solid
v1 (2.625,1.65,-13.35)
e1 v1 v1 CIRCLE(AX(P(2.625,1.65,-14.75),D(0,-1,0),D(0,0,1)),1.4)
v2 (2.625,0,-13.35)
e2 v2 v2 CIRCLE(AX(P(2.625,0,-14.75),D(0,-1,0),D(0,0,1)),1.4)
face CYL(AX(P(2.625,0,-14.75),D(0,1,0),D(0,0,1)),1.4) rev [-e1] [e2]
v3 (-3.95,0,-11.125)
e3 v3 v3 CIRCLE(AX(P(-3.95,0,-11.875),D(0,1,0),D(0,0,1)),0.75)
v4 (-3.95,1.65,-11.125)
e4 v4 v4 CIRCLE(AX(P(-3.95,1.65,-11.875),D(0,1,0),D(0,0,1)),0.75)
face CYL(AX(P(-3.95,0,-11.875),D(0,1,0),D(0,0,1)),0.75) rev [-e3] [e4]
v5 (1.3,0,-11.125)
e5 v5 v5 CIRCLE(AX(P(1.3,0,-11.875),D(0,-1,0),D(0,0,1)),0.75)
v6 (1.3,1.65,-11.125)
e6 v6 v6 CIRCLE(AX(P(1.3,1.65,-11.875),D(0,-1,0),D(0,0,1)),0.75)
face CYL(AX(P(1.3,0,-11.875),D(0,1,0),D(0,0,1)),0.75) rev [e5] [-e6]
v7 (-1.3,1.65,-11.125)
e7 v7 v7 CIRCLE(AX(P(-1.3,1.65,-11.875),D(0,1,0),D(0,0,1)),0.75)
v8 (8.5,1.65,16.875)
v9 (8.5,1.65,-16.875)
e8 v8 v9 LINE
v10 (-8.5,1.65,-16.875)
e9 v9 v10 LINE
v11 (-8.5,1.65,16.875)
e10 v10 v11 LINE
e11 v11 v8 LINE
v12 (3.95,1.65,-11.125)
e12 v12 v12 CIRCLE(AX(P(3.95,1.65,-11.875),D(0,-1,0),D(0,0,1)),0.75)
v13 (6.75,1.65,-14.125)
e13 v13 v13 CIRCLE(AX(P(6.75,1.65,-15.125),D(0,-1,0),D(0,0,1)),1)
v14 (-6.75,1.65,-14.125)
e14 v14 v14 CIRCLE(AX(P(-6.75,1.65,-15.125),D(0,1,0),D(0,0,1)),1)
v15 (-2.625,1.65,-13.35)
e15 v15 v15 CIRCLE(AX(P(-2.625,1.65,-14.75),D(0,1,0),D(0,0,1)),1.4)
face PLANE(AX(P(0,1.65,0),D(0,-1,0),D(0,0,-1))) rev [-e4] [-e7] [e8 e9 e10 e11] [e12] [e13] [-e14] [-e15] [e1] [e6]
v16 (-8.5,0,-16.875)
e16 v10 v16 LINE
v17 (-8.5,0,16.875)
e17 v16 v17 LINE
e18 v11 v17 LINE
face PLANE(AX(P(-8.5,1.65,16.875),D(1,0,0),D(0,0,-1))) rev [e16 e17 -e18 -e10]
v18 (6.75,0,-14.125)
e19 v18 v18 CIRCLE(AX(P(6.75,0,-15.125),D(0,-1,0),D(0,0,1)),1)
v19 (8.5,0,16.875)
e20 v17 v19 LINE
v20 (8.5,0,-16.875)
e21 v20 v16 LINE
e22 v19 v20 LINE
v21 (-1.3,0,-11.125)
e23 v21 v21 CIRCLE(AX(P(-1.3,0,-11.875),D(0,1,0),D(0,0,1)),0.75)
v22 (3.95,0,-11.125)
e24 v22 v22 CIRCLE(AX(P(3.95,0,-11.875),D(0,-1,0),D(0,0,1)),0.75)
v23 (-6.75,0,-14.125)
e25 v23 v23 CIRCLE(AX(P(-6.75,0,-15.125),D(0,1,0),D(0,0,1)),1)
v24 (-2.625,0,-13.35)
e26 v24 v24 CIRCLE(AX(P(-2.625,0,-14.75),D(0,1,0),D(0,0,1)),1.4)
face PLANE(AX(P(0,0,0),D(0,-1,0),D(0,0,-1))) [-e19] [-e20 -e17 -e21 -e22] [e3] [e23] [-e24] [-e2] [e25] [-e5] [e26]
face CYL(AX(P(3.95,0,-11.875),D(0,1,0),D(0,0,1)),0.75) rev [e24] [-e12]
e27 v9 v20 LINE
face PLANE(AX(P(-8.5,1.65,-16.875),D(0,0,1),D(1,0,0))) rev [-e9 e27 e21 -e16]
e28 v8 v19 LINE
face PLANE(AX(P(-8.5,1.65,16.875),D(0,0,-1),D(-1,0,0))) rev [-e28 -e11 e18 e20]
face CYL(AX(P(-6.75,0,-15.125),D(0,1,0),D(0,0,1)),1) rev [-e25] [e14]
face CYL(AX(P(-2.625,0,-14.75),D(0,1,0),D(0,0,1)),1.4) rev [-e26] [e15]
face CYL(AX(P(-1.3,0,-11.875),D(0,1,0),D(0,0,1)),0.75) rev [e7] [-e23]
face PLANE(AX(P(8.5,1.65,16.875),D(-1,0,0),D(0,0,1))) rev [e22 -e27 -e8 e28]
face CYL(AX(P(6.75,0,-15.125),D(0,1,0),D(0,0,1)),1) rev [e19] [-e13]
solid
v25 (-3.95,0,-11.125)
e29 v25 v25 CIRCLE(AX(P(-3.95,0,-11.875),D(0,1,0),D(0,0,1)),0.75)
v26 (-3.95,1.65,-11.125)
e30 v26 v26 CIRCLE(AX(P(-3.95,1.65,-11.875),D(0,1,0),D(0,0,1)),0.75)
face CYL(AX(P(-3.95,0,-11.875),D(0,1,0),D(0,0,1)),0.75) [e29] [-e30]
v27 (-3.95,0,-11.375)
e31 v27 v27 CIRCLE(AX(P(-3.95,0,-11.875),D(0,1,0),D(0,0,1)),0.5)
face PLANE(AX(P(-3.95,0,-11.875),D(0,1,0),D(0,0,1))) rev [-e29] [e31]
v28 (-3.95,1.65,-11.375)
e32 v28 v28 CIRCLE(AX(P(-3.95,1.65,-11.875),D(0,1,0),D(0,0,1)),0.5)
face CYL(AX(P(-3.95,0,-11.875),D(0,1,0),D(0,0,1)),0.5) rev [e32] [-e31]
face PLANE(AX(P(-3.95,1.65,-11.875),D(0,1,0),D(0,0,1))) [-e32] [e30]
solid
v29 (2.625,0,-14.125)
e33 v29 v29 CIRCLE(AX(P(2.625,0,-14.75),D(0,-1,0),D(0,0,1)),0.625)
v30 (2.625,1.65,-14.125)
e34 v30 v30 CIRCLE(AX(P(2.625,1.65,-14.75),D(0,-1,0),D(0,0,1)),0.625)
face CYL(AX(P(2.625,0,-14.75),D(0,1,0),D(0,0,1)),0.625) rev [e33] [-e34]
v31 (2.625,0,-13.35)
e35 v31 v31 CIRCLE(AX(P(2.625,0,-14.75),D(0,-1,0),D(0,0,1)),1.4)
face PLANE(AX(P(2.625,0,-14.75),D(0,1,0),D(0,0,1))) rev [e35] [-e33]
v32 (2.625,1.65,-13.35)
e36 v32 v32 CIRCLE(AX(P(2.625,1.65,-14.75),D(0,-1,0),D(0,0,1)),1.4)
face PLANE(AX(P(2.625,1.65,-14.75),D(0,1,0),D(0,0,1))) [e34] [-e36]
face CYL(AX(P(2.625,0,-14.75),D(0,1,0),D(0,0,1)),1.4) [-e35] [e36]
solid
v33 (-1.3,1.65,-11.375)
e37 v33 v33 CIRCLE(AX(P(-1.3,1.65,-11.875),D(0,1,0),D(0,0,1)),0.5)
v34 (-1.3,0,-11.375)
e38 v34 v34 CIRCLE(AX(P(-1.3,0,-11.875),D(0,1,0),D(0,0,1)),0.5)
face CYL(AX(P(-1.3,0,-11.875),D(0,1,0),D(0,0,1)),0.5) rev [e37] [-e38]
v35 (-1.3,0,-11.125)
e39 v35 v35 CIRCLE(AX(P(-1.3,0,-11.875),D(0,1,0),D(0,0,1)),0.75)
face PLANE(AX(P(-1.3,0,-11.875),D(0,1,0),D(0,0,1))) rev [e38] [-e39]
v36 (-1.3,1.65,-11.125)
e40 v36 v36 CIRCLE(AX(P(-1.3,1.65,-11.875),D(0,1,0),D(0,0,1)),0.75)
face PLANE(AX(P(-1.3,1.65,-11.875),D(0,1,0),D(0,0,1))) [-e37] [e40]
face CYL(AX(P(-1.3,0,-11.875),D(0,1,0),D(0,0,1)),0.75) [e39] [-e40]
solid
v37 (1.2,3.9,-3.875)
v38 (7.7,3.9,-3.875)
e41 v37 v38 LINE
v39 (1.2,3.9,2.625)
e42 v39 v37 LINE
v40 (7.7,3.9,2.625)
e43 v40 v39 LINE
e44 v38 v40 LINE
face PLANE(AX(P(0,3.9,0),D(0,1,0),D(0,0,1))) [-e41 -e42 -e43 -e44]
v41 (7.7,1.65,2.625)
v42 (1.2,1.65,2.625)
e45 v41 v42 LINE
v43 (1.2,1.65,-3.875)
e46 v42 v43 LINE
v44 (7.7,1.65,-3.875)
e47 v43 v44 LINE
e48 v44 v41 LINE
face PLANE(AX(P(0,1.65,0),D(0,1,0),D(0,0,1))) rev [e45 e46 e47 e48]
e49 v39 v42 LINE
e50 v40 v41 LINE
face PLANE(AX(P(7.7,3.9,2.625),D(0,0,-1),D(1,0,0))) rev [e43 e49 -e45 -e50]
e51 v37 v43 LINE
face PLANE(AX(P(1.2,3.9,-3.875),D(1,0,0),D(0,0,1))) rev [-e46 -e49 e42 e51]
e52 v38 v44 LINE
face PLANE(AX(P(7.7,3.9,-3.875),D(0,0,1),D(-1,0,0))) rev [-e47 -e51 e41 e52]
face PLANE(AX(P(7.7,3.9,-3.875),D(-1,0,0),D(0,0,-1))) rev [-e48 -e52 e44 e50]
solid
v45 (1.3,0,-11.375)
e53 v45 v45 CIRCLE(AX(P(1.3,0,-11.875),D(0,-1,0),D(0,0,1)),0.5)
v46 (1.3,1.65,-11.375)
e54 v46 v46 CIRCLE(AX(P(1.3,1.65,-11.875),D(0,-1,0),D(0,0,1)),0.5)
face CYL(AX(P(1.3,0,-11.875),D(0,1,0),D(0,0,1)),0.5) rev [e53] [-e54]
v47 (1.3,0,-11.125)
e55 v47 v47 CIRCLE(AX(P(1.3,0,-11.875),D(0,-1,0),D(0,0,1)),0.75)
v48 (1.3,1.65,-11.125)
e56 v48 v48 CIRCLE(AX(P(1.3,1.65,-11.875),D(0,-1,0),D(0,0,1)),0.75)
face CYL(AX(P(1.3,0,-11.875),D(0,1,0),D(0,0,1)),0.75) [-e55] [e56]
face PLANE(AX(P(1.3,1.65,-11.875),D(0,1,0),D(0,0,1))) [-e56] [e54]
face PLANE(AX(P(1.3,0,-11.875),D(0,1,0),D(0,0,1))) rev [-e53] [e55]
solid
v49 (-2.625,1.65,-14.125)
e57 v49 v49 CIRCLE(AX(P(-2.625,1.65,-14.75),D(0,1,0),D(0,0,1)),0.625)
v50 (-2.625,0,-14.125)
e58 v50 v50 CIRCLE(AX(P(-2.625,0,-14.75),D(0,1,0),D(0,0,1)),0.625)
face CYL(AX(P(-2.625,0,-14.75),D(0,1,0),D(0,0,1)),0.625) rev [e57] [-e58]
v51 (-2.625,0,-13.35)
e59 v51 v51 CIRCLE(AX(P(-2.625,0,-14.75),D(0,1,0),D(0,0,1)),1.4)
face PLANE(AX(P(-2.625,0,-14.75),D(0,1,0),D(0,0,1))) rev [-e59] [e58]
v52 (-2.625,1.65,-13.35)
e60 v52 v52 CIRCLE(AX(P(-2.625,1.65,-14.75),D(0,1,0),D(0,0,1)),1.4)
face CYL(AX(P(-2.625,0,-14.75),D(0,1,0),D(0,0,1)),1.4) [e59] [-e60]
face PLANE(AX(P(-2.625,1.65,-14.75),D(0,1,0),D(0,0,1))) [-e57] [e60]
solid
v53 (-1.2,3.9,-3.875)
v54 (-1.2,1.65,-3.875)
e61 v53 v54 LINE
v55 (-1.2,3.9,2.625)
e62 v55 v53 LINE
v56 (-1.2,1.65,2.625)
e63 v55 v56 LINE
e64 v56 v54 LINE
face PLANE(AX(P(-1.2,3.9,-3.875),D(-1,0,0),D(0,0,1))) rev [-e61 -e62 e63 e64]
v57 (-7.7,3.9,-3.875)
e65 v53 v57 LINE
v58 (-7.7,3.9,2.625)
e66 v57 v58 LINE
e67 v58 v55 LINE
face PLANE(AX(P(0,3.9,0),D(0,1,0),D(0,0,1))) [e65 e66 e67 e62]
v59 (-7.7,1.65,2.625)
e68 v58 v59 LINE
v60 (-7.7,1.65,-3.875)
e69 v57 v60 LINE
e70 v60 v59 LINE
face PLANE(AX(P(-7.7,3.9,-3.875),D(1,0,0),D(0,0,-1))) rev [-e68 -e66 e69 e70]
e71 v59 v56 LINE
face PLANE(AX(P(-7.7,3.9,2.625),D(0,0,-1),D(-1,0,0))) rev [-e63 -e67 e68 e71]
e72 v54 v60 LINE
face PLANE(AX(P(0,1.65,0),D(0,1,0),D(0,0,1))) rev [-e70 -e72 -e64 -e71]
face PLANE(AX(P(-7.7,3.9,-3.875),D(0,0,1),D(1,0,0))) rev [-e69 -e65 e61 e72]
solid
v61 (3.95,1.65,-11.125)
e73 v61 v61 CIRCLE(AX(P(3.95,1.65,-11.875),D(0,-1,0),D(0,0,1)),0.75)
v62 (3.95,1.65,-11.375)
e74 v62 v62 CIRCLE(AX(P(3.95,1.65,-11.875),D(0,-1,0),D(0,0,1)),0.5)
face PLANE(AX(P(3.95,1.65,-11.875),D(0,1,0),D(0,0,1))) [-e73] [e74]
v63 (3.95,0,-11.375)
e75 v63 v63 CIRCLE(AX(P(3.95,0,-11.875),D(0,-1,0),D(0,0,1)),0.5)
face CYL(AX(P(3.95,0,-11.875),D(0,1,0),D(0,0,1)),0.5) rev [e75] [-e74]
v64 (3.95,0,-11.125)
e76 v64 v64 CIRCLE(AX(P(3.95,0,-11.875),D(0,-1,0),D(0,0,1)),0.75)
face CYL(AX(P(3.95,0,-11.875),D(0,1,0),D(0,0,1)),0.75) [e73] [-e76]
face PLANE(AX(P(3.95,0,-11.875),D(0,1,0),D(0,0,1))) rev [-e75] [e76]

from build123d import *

# Parameters (mm, degrees)
PCB_SKETCH_W                     = 17
PCB_SKETCH_H                     = 33.75
PCB_EXTRUDE_DEPTH                = 1.65
THROUGH_HOLE_SKETCH_R            = 1.4
THROUGH_HOLE_SKETCH_R_2          = 0.625
THROUGH_HOLE_SKETCH_R_3          = 0.75
THROUGH_HOLE_SKETCH_R_4          = 0.5
THROUGH_HOLE_CUT_DEPTH           = 19.966763693
MOUNTING_HOLES_SKETCH_R          = 1
MOUNTING_HOLE_CUT_DEPTH          = 1.65
HOLES_MIRROR_OUTLINE_R           = 1.4
HOLES_MIRROR_OUTLINE_R_2         = 0.75
HOLES_MIRROR_OUTLINE_R_3         = 1
HOLES_MIRROR_DEPTH               = 1.65
THROUGH_HOLE_EXTRUDE_OUTLINE_R   = 0.75
THROUGH_HOLE_EXTRUDE_OUTLINE_R_2 = 0.5
THROUGH_HOLE_EXTRUDE_OUTLINE_R_3 = 1.4
THROUGH_HOLE_EXTRUDE_OUTLINE_R_4 = 0.625
THROUGH_HOLE_EXTRUDE_DEPTH       = 1.65
MOSFET_SKETCH_W                  = 6.5
MOSFET_SKETCH_H                  = 6.5
MOSFET_EXTRUDE_DEPTH             = 2.25


# Read off the part's stored shape, not the designer's step: Holes Mirror, Through Hole Extrude
with BuildPart() as part:
    # PCB Sketch → PCB Extrude (new body)
    with BuildSketch(Plane(origin=(0, 0, 0), x_dir=(1, 0, 0), z_dir=(0, 1, 0))):
        Rectangle(PCB_SKETCH_W, PCB_SKETCH_H)
    extrude(amount=PCB_EXTRUDE_DEPTH)

    # Through Hole Sketch → Through Hole Cut (cut, through all)
    # profile 1 of 4: a face of its own
    with BuildSketch(Plane(origin=(0, 1.65, 0), x_dir=(1, 0, 0), z_dir=(0, 1, 0))):
        with Locations(Location((-2.625, 14.75, 0), (0, 0, 270))):
            Circle(THROUGH_HOLE_SKETCH_R)
        with Locations((-2.625, 14.75)):
            Circle(THROUGH_HOLE_SKETCH_R_2, mode=Mode.SUBTRACT)
    # profile 2 of 4: a face of its own
    with BuildSketch(Plane(origin=(0, 1.65, 0), x_dir=(1, 0, 0), z_dir=(0, 1, 0))):
        with Locations((-2.625, 14.75)):
            Circle(THROUGH_HOLE_SKETCH_R_2)
    # profile 3 of 4: a face of its own
    with BuildSketch(Plane(origin=(0, 1.65, 0), x_dir=(1, 0, 0), z_dir=(0, 1, 0))):
        with Locations(Location((-1.3, 11.875, 0), (0, 0, 270))):
            Circle(THROUGH_HOLE_SKETCH_R_3)
        with Locations((-1.3, 11.875)):
            Circle(THROUGH_HOLE_SKETCH_R_4, mode=Mode.SUBTRACT)
    # profile 4 of 4: a face of its own
    with BuildSketch(Plane(origin=(0, 1.65, 0), x_dir=(1, 0, 0), z_dir=(0, 1, 0))):
        with Locations(Location((-3.95, 11.875, 0), (0, 0, 270))):
            Circle(THROUGH_HOLE_SKETCH_R_3)
    extrude(amount=-THROUGH_HOLE_CUT_DEPTH, mode=Mode.SUBTRACT)


with BuildPart() as through_hole_cut_kept_piece:
    # of the separate pieces the step leaves, the one the design keeps (through_hole_cut_pieces_kept)
    add(part.part.solids().sort_by_distance((-8.5, 0, 16.875))[0])

    # Mounting Holes Sketch → Mounting Hole Cut (cut)
    with BuildSketch(Plane(origin=(0, 1.65, 0), x_dir=(1, 0, 0), z_dir=(0, 1, 0))):
        with Locations(Location((-6.75, 15.125, 0), (0, 0, 270))):
            Circle(MOUNTING_HOLES_SKETCH_R)
    extrude(amount=-MOUNTING_HOLE_CUT_DEPTH, mode=Mode.SUBTRACT)

    # Holes Mirror outline → Holes Mirror (cut)
    with BuildSketch(Plane(origin=(0, 0, 0), x_dir=(1, 0, 0), z_dir=(0, 1, 0))):
        with Locations((2.625, 14.75)):
            Circle(HOLES_MIRROR_OUTLINE_R)
        with Locations((1.3, 11.875)):
            Circle(HOLES_MIRROR_OUTLINE_R_2)
        with Locations((3.95, 11.875)):
            Circle(HOLES_MIRROR_OUTLINE_R_2)
        with Locations((6.75, 15.125)):
            Circle(HOLES_MIRROR_OUTLINE_R_3)
    extrude(amount=HOLES_MIRROR_DEPTH, mode=Mode.SUBTRACT)


with BuildPart() as body_2:
    # Through Hole Extrude outline → Through Hole Extrude (new body)
    # profile 1 of 3: a face of its own
    with BuildSketch(Plane(origin=(0, 0, 0), x_dir=(1, 0, 0), z_dir=(0, 1, 0))):
        with Locations((-3.95, 11.875)):
            Circle(THROUGH_HOLE_EXTRUDE_OUTLINE_R)
        with Locations((-3.95, 11.875)):
            Circle(THROUGH_HOLE_EXTRUDE_OUTLINE_R_2, mode=Mode.SUBTRACT)
    # profile 2 of 3: a face of its own
    with BuildSketch(Plane(origin=(0, 0, 0), x_dir=(1, 0, 0), z_dir=(0, 1, 0))):
        with Locations((-1.3, 11.875)):
            Circle(THROUGH_HOLE_EXTRUDE_OUTLINE_R)
        with Locations((-1.3, 11.875)):
            Circle(THROUGH_HOLE_EXTRUDE_OUTLINE_R_2, mode=Mode.SUBTRACT)
    # profile 3 of 3: a face of its own
    with BuildSketch(Plane(origin=(0, 0, 0), x_dir=(1, 0, 0), z_dir=(0, 1, 0))):
        with Locations((-2.625, 14.75)):
            Circle(THROUGH_HOLE_EXTRUDE_OUTLINE_R_3)
        with Locations((-2.625, 14.75)):
            Circle(THROUGH_HOLE_EXTRUDE_OUTLINE_R_4, mode=Mode.SUBTRACT)
    extrude(amount=THROUGH_HOLE_EXTRUDE_DEPTH)


with BuildPart() as body_3:
    # Mosfet Sketch → Mosfet Extrude (new body)
    with BuildSketch(Plane(origin=(0, 1.65, 0), x_dir=(1, 0, 0), z_dir=(0, 1, 0))):
        with Locations((-4.45, 0.625)):
            Rectangle(MOSFET_SKETCH_W, MOSFET_SKETCH_H)
    extrude(amount=MOSFET_EXTRUDE_DEPTH)


with BuildPart() as body_4:
    # Bodies Mirror: mirrored copy
    add(body_2.part.mirror(Plane(origin=(0, 0, 0), x_dir=(0, 0, 1), z_dir=(1, 0, 0))))


with BuildPart() as body_5:
    # Bodies Mirror 2: mirrored copy
    add(body_3.part.mirror(Plane(origin=(0, 0, 0), x_dir=(0, 0, 1), z_dir=(1, 0, 0))))


solid = Compound([through_hole_cut_kept_piece.part, body_2.part, body_3.part, body_4.part, body_5.part])
